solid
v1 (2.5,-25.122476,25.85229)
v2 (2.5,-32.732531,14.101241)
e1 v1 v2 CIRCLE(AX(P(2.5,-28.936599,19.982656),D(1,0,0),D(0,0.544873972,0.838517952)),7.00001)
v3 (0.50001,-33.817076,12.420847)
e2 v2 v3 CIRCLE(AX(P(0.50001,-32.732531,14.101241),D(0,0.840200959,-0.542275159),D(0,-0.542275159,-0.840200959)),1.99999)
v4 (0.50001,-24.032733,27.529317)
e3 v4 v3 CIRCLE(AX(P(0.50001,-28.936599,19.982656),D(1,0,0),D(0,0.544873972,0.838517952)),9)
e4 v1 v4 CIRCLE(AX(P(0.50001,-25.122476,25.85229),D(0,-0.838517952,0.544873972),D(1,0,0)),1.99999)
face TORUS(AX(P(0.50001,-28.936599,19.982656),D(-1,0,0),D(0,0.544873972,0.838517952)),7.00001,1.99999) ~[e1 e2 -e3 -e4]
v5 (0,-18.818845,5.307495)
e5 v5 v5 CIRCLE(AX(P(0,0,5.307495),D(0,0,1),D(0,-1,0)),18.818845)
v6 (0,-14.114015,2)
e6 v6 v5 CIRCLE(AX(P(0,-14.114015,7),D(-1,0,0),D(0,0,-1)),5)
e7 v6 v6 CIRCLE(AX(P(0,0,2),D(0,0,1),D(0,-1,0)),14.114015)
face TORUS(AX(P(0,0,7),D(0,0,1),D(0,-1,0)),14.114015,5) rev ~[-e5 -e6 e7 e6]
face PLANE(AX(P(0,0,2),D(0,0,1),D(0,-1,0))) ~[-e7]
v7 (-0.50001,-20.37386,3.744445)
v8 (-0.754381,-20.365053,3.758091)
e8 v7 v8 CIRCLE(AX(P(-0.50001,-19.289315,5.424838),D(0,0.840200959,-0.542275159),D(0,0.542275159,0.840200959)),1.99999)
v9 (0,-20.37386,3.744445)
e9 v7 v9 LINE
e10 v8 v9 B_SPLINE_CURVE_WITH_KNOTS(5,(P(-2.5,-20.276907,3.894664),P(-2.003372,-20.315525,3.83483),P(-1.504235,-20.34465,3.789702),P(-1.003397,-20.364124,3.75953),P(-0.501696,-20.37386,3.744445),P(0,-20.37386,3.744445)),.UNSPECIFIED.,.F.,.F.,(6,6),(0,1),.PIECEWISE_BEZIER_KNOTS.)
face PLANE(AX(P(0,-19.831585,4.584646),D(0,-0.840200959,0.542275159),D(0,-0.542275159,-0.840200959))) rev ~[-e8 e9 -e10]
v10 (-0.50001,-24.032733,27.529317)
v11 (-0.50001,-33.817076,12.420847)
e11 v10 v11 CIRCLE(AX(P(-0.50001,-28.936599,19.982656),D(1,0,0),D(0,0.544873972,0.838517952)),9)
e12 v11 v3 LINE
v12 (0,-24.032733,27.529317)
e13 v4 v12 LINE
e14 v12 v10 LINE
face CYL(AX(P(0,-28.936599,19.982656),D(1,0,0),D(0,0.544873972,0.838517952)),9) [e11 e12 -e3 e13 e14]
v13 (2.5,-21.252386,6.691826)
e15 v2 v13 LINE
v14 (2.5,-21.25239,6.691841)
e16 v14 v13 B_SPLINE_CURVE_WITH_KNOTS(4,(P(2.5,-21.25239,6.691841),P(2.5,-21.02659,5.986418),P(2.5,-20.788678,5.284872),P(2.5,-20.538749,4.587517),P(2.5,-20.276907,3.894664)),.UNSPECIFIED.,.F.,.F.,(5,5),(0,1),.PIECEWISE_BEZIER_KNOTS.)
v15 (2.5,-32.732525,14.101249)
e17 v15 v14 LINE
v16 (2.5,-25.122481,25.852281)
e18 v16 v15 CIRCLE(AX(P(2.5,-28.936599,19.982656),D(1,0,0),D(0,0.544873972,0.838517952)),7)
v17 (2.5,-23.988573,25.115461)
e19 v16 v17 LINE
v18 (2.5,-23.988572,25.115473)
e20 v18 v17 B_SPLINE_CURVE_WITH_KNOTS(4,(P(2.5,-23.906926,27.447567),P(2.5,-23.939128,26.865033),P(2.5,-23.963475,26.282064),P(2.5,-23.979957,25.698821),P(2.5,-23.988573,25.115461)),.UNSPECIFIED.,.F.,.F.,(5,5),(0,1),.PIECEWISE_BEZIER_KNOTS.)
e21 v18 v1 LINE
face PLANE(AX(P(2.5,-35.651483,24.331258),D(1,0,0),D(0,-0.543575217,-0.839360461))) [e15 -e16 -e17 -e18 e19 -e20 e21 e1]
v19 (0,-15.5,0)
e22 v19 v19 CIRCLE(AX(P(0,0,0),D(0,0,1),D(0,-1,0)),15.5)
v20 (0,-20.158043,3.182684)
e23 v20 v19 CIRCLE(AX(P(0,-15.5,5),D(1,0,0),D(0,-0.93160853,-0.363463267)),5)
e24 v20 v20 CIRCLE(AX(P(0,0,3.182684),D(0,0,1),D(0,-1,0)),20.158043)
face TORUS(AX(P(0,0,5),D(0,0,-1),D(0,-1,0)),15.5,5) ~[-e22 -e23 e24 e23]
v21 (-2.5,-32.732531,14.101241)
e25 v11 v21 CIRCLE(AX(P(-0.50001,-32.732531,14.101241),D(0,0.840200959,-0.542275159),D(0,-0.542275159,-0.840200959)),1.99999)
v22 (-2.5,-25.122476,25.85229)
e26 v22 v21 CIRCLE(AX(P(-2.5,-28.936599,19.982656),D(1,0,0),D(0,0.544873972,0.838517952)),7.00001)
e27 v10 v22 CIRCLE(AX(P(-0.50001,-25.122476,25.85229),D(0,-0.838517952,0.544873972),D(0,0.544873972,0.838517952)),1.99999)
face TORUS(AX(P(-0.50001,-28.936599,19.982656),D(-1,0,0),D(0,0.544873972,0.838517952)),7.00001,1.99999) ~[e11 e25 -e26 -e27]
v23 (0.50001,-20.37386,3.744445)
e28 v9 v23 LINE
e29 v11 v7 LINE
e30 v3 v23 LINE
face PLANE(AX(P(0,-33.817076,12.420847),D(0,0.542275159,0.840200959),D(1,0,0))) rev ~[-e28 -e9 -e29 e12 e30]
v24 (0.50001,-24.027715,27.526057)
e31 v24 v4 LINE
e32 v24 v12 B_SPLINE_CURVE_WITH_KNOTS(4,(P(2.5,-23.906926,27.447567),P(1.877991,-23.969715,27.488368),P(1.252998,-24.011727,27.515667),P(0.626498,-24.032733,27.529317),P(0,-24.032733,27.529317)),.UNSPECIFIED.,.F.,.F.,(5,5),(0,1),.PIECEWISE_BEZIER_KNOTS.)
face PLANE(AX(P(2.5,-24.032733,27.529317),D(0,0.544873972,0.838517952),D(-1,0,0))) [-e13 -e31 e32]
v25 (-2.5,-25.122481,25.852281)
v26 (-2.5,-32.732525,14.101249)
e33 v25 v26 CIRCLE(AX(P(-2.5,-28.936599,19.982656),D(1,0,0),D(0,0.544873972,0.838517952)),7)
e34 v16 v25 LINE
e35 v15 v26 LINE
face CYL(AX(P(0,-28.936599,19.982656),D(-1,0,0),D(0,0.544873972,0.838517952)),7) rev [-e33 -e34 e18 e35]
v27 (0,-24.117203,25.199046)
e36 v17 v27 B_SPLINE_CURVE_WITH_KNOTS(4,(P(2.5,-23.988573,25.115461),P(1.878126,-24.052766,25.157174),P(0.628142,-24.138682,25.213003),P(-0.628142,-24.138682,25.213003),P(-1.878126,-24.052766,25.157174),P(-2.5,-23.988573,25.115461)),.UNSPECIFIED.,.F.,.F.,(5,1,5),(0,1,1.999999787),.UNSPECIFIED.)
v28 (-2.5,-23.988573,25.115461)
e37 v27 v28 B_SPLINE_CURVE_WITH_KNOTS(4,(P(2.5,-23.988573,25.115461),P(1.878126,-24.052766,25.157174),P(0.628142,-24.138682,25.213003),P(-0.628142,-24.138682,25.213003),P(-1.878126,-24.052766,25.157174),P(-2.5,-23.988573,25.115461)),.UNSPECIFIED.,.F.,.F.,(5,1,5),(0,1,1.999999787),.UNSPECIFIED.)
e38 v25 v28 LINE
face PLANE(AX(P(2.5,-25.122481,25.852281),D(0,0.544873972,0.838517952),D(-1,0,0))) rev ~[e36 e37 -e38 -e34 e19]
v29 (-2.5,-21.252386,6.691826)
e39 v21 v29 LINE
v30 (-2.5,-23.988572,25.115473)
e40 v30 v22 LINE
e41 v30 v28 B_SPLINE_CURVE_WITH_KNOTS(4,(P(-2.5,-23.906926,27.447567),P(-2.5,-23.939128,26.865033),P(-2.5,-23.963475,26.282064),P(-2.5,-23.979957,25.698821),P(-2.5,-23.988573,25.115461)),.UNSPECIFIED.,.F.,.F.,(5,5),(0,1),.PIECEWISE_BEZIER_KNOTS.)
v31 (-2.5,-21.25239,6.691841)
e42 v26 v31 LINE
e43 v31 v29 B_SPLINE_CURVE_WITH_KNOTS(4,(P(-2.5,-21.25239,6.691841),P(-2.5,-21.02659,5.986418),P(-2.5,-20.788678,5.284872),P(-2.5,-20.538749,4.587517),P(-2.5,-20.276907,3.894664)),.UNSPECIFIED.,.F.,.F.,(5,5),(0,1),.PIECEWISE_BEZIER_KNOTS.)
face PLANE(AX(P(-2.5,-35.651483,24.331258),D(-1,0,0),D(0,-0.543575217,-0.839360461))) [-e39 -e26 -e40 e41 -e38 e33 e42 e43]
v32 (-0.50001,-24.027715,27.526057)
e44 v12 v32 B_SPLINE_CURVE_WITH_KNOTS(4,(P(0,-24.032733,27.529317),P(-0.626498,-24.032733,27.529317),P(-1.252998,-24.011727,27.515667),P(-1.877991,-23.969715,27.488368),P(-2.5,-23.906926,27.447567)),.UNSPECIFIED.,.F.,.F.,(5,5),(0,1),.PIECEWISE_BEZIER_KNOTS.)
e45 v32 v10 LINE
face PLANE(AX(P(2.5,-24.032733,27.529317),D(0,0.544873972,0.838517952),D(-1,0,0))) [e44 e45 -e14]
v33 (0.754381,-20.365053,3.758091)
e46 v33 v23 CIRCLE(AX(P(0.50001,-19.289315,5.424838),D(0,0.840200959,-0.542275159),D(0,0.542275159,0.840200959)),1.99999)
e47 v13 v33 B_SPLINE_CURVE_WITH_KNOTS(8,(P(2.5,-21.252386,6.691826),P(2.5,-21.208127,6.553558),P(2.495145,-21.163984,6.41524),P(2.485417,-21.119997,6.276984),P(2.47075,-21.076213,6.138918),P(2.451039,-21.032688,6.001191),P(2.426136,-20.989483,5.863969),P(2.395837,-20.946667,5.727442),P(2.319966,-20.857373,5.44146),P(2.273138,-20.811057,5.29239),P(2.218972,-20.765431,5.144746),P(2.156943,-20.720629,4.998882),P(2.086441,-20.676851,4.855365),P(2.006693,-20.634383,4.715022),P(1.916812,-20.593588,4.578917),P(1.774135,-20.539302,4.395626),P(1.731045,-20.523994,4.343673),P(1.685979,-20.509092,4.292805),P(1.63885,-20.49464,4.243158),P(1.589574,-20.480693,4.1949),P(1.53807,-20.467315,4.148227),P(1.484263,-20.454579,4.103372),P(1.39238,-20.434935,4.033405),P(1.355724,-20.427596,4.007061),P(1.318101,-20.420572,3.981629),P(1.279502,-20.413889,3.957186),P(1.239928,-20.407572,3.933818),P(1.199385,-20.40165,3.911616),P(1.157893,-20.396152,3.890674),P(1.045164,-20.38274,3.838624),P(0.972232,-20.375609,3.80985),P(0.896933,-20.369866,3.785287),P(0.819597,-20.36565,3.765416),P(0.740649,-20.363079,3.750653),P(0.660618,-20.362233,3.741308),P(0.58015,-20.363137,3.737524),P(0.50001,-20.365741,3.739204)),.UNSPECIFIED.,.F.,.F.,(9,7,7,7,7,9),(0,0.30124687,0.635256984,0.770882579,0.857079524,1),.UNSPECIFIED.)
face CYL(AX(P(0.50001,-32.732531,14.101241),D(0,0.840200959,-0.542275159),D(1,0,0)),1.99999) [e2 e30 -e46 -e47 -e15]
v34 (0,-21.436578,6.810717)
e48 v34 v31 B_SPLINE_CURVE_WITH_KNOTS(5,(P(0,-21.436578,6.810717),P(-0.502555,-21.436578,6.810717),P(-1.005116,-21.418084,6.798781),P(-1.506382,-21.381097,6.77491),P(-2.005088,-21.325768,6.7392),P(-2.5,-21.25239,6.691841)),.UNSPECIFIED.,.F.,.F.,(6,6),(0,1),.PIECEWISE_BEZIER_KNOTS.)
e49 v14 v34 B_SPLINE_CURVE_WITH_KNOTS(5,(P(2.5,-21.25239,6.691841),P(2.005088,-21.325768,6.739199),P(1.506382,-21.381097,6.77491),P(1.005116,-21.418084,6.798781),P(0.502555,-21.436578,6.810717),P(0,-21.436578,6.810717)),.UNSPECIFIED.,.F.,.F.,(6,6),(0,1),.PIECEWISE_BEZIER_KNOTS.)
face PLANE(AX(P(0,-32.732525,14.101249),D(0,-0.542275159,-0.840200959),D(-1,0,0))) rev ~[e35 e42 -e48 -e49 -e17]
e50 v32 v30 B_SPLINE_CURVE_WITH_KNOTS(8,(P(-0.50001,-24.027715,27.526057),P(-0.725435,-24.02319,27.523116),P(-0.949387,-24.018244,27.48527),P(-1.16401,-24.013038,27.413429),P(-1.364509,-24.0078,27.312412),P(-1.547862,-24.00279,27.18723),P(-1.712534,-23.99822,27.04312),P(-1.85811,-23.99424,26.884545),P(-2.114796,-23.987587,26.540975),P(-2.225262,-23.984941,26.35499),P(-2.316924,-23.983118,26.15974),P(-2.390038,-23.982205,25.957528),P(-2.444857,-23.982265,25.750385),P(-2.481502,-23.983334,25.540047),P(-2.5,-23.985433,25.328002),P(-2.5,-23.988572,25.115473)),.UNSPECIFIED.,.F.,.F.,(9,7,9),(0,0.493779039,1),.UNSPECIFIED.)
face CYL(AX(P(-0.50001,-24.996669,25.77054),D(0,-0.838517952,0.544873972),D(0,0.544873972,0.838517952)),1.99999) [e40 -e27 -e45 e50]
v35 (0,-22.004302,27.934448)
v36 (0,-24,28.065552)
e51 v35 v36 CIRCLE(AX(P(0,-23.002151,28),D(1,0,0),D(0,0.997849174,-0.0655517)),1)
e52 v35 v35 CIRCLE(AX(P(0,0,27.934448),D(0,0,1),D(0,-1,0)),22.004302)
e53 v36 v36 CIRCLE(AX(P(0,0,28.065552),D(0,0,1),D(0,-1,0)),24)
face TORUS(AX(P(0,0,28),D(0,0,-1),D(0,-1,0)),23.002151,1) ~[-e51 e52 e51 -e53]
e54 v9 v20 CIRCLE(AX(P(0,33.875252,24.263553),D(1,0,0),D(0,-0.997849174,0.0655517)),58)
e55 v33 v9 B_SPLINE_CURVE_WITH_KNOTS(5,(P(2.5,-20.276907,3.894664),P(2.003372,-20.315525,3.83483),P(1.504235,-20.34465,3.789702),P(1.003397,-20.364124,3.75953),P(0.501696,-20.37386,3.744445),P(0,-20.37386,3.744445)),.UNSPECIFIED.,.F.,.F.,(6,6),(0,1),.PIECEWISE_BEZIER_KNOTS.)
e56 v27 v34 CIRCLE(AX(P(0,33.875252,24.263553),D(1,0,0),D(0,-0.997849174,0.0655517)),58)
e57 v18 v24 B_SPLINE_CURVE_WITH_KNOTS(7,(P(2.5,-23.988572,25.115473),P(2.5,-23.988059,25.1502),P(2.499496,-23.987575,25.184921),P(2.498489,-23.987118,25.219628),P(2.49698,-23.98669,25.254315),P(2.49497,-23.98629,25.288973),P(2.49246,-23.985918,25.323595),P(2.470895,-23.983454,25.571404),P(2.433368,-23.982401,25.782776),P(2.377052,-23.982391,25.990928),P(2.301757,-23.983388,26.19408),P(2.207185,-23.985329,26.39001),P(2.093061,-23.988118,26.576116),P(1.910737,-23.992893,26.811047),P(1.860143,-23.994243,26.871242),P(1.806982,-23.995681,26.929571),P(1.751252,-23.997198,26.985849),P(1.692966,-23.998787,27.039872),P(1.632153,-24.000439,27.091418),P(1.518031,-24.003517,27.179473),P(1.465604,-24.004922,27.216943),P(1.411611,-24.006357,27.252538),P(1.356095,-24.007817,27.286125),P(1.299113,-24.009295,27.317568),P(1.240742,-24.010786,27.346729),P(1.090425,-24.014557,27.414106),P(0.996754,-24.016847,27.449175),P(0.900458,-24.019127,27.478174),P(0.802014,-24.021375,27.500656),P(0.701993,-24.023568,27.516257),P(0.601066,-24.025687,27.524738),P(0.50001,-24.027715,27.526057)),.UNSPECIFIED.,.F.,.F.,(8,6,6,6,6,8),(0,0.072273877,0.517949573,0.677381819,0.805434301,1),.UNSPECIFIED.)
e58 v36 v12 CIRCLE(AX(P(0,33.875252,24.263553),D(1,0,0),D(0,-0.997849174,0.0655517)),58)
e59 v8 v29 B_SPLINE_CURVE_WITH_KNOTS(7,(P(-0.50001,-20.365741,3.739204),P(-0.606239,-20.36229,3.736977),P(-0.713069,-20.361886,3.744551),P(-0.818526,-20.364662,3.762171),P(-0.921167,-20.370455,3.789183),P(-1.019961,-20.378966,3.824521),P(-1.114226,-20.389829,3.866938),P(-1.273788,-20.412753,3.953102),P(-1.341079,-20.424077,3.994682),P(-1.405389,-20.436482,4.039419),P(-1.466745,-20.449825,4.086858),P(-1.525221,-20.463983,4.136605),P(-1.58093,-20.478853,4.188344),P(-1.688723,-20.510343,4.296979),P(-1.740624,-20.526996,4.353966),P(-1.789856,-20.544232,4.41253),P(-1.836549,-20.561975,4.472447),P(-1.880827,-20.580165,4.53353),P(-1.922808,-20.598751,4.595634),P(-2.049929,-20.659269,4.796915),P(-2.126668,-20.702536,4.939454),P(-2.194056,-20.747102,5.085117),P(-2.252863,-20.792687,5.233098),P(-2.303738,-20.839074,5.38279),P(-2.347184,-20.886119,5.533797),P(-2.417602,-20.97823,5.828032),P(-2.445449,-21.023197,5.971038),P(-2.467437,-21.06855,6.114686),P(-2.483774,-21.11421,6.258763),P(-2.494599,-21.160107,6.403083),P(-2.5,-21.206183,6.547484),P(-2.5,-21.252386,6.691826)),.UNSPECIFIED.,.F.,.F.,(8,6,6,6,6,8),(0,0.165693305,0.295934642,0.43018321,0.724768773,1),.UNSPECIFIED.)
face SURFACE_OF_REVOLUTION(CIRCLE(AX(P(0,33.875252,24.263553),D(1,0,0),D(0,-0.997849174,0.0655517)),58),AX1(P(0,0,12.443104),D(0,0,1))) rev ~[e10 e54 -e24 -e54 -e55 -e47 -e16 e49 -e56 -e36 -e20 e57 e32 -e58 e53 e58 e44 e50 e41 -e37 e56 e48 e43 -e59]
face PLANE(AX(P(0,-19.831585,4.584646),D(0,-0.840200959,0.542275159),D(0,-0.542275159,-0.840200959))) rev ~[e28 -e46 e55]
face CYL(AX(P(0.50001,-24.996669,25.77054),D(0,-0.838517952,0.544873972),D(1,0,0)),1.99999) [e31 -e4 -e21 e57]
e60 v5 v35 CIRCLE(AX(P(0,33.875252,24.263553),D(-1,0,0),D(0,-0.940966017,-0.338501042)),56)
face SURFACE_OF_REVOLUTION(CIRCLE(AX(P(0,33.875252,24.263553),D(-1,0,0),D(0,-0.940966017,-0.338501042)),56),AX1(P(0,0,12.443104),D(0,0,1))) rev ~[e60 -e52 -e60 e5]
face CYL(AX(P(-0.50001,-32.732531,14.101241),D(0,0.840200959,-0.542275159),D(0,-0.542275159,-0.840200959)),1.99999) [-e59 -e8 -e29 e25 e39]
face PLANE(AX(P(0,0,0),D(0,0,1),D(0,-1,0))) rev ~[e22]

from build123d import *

# Parameters (mm, degrees)
F4_W = 5
F4_H = 2
F7_R = 1.99999


# Not quite as in the source:
# - a fillet or chamfer is up to 0.001 mm smaller than in the source, because OpenCascade refuses the exact size


with BuildPart() as f1:
    # F0 (on Right) → F1 (revolve)
    with BuildSketch(Plane.YZ):
        with BuildLine():
            Line((-15.5, 0), (0, 0))
            Line((0, 0), (0, 2))
            Line((0, 2), (-14.1140147466, 2))
            ThreePointArc((-14.1140147466, 2), (-16.9895559094, 2.9096133409), (-18.8188448306, 5.3074947916))
            ThreePointArc((-18.8188448306, 5.3074947916), (-21.5779187909, 16.4567716512), (-22.0043016514, 27.9344483005))
            ThreePointArc((-22.0043016514, 27.9344483005), (-22.9365991261, 28.9978491743), (-24, 28.0655516995))
            ThreePointArc((-24, 28.0655516995), (-23.4455119823, 15.4131291908), (-20.1580426519, 3.1826836674))
            ThreePointArc((-20.1580426519, 3.1826836674), (-18.3207639335, 0.8716479279), (-15.5, 0))
        make_face()
    revolve(axis=Axis((0, 0, 12.4431038275), (0, 0, 1)))

    # F4 (on line) → F5 (join, up to the next surface of F1)
    with BuildSketch(Plane(origin=(0, -29.4754881711, 19.1533482092), x_dir=(-1, 0, 0), z_dir=(0, 0.8385179515, -0.5448739716))):
        with Locations((0, 8.9890159432)):
            Rectangle(F4_W, F4_H)
    extrude(until=Until.NEXT)

    # F6: sweep along a path in F2
    with BuildLine(Plane.YZ) as f6_path:
        ThreePointArc((-24.0327333815, 27.5293173957), (-36.4908432768, 24.8748327821), (-33.8170755575, 12.4208471988))
        Line((-33.8170755575, 12.4208471988), (-20.3738602098, 3.7444446542))
    # F4 (on line) → F6 (sweep)
    with BuildSketch(Plane(origin=(0, -29.4754881711, 19.1533482092), x_dir=(-1, 0, 0), z_dir=(0, 0.8385179515, -0.5448739716))):
        with Locations((0, 8.9890159432)):
            Rectangle(F4_W, F4_H)
    sweep(path=f6_path.line)

    # F7 (radius 2 in the source; OpenCascade refuses exactly that, so slightly less here)
    f7_edges = [f1.edges().sort_by_distance(p)[0] for p in [
        (-2.5, -36.490843, 24.874833),
        (2.5, -36.490843, 24.874833),
    ]]
    fillet(f7_edges, radius=F7_R)


solid = f1.part
